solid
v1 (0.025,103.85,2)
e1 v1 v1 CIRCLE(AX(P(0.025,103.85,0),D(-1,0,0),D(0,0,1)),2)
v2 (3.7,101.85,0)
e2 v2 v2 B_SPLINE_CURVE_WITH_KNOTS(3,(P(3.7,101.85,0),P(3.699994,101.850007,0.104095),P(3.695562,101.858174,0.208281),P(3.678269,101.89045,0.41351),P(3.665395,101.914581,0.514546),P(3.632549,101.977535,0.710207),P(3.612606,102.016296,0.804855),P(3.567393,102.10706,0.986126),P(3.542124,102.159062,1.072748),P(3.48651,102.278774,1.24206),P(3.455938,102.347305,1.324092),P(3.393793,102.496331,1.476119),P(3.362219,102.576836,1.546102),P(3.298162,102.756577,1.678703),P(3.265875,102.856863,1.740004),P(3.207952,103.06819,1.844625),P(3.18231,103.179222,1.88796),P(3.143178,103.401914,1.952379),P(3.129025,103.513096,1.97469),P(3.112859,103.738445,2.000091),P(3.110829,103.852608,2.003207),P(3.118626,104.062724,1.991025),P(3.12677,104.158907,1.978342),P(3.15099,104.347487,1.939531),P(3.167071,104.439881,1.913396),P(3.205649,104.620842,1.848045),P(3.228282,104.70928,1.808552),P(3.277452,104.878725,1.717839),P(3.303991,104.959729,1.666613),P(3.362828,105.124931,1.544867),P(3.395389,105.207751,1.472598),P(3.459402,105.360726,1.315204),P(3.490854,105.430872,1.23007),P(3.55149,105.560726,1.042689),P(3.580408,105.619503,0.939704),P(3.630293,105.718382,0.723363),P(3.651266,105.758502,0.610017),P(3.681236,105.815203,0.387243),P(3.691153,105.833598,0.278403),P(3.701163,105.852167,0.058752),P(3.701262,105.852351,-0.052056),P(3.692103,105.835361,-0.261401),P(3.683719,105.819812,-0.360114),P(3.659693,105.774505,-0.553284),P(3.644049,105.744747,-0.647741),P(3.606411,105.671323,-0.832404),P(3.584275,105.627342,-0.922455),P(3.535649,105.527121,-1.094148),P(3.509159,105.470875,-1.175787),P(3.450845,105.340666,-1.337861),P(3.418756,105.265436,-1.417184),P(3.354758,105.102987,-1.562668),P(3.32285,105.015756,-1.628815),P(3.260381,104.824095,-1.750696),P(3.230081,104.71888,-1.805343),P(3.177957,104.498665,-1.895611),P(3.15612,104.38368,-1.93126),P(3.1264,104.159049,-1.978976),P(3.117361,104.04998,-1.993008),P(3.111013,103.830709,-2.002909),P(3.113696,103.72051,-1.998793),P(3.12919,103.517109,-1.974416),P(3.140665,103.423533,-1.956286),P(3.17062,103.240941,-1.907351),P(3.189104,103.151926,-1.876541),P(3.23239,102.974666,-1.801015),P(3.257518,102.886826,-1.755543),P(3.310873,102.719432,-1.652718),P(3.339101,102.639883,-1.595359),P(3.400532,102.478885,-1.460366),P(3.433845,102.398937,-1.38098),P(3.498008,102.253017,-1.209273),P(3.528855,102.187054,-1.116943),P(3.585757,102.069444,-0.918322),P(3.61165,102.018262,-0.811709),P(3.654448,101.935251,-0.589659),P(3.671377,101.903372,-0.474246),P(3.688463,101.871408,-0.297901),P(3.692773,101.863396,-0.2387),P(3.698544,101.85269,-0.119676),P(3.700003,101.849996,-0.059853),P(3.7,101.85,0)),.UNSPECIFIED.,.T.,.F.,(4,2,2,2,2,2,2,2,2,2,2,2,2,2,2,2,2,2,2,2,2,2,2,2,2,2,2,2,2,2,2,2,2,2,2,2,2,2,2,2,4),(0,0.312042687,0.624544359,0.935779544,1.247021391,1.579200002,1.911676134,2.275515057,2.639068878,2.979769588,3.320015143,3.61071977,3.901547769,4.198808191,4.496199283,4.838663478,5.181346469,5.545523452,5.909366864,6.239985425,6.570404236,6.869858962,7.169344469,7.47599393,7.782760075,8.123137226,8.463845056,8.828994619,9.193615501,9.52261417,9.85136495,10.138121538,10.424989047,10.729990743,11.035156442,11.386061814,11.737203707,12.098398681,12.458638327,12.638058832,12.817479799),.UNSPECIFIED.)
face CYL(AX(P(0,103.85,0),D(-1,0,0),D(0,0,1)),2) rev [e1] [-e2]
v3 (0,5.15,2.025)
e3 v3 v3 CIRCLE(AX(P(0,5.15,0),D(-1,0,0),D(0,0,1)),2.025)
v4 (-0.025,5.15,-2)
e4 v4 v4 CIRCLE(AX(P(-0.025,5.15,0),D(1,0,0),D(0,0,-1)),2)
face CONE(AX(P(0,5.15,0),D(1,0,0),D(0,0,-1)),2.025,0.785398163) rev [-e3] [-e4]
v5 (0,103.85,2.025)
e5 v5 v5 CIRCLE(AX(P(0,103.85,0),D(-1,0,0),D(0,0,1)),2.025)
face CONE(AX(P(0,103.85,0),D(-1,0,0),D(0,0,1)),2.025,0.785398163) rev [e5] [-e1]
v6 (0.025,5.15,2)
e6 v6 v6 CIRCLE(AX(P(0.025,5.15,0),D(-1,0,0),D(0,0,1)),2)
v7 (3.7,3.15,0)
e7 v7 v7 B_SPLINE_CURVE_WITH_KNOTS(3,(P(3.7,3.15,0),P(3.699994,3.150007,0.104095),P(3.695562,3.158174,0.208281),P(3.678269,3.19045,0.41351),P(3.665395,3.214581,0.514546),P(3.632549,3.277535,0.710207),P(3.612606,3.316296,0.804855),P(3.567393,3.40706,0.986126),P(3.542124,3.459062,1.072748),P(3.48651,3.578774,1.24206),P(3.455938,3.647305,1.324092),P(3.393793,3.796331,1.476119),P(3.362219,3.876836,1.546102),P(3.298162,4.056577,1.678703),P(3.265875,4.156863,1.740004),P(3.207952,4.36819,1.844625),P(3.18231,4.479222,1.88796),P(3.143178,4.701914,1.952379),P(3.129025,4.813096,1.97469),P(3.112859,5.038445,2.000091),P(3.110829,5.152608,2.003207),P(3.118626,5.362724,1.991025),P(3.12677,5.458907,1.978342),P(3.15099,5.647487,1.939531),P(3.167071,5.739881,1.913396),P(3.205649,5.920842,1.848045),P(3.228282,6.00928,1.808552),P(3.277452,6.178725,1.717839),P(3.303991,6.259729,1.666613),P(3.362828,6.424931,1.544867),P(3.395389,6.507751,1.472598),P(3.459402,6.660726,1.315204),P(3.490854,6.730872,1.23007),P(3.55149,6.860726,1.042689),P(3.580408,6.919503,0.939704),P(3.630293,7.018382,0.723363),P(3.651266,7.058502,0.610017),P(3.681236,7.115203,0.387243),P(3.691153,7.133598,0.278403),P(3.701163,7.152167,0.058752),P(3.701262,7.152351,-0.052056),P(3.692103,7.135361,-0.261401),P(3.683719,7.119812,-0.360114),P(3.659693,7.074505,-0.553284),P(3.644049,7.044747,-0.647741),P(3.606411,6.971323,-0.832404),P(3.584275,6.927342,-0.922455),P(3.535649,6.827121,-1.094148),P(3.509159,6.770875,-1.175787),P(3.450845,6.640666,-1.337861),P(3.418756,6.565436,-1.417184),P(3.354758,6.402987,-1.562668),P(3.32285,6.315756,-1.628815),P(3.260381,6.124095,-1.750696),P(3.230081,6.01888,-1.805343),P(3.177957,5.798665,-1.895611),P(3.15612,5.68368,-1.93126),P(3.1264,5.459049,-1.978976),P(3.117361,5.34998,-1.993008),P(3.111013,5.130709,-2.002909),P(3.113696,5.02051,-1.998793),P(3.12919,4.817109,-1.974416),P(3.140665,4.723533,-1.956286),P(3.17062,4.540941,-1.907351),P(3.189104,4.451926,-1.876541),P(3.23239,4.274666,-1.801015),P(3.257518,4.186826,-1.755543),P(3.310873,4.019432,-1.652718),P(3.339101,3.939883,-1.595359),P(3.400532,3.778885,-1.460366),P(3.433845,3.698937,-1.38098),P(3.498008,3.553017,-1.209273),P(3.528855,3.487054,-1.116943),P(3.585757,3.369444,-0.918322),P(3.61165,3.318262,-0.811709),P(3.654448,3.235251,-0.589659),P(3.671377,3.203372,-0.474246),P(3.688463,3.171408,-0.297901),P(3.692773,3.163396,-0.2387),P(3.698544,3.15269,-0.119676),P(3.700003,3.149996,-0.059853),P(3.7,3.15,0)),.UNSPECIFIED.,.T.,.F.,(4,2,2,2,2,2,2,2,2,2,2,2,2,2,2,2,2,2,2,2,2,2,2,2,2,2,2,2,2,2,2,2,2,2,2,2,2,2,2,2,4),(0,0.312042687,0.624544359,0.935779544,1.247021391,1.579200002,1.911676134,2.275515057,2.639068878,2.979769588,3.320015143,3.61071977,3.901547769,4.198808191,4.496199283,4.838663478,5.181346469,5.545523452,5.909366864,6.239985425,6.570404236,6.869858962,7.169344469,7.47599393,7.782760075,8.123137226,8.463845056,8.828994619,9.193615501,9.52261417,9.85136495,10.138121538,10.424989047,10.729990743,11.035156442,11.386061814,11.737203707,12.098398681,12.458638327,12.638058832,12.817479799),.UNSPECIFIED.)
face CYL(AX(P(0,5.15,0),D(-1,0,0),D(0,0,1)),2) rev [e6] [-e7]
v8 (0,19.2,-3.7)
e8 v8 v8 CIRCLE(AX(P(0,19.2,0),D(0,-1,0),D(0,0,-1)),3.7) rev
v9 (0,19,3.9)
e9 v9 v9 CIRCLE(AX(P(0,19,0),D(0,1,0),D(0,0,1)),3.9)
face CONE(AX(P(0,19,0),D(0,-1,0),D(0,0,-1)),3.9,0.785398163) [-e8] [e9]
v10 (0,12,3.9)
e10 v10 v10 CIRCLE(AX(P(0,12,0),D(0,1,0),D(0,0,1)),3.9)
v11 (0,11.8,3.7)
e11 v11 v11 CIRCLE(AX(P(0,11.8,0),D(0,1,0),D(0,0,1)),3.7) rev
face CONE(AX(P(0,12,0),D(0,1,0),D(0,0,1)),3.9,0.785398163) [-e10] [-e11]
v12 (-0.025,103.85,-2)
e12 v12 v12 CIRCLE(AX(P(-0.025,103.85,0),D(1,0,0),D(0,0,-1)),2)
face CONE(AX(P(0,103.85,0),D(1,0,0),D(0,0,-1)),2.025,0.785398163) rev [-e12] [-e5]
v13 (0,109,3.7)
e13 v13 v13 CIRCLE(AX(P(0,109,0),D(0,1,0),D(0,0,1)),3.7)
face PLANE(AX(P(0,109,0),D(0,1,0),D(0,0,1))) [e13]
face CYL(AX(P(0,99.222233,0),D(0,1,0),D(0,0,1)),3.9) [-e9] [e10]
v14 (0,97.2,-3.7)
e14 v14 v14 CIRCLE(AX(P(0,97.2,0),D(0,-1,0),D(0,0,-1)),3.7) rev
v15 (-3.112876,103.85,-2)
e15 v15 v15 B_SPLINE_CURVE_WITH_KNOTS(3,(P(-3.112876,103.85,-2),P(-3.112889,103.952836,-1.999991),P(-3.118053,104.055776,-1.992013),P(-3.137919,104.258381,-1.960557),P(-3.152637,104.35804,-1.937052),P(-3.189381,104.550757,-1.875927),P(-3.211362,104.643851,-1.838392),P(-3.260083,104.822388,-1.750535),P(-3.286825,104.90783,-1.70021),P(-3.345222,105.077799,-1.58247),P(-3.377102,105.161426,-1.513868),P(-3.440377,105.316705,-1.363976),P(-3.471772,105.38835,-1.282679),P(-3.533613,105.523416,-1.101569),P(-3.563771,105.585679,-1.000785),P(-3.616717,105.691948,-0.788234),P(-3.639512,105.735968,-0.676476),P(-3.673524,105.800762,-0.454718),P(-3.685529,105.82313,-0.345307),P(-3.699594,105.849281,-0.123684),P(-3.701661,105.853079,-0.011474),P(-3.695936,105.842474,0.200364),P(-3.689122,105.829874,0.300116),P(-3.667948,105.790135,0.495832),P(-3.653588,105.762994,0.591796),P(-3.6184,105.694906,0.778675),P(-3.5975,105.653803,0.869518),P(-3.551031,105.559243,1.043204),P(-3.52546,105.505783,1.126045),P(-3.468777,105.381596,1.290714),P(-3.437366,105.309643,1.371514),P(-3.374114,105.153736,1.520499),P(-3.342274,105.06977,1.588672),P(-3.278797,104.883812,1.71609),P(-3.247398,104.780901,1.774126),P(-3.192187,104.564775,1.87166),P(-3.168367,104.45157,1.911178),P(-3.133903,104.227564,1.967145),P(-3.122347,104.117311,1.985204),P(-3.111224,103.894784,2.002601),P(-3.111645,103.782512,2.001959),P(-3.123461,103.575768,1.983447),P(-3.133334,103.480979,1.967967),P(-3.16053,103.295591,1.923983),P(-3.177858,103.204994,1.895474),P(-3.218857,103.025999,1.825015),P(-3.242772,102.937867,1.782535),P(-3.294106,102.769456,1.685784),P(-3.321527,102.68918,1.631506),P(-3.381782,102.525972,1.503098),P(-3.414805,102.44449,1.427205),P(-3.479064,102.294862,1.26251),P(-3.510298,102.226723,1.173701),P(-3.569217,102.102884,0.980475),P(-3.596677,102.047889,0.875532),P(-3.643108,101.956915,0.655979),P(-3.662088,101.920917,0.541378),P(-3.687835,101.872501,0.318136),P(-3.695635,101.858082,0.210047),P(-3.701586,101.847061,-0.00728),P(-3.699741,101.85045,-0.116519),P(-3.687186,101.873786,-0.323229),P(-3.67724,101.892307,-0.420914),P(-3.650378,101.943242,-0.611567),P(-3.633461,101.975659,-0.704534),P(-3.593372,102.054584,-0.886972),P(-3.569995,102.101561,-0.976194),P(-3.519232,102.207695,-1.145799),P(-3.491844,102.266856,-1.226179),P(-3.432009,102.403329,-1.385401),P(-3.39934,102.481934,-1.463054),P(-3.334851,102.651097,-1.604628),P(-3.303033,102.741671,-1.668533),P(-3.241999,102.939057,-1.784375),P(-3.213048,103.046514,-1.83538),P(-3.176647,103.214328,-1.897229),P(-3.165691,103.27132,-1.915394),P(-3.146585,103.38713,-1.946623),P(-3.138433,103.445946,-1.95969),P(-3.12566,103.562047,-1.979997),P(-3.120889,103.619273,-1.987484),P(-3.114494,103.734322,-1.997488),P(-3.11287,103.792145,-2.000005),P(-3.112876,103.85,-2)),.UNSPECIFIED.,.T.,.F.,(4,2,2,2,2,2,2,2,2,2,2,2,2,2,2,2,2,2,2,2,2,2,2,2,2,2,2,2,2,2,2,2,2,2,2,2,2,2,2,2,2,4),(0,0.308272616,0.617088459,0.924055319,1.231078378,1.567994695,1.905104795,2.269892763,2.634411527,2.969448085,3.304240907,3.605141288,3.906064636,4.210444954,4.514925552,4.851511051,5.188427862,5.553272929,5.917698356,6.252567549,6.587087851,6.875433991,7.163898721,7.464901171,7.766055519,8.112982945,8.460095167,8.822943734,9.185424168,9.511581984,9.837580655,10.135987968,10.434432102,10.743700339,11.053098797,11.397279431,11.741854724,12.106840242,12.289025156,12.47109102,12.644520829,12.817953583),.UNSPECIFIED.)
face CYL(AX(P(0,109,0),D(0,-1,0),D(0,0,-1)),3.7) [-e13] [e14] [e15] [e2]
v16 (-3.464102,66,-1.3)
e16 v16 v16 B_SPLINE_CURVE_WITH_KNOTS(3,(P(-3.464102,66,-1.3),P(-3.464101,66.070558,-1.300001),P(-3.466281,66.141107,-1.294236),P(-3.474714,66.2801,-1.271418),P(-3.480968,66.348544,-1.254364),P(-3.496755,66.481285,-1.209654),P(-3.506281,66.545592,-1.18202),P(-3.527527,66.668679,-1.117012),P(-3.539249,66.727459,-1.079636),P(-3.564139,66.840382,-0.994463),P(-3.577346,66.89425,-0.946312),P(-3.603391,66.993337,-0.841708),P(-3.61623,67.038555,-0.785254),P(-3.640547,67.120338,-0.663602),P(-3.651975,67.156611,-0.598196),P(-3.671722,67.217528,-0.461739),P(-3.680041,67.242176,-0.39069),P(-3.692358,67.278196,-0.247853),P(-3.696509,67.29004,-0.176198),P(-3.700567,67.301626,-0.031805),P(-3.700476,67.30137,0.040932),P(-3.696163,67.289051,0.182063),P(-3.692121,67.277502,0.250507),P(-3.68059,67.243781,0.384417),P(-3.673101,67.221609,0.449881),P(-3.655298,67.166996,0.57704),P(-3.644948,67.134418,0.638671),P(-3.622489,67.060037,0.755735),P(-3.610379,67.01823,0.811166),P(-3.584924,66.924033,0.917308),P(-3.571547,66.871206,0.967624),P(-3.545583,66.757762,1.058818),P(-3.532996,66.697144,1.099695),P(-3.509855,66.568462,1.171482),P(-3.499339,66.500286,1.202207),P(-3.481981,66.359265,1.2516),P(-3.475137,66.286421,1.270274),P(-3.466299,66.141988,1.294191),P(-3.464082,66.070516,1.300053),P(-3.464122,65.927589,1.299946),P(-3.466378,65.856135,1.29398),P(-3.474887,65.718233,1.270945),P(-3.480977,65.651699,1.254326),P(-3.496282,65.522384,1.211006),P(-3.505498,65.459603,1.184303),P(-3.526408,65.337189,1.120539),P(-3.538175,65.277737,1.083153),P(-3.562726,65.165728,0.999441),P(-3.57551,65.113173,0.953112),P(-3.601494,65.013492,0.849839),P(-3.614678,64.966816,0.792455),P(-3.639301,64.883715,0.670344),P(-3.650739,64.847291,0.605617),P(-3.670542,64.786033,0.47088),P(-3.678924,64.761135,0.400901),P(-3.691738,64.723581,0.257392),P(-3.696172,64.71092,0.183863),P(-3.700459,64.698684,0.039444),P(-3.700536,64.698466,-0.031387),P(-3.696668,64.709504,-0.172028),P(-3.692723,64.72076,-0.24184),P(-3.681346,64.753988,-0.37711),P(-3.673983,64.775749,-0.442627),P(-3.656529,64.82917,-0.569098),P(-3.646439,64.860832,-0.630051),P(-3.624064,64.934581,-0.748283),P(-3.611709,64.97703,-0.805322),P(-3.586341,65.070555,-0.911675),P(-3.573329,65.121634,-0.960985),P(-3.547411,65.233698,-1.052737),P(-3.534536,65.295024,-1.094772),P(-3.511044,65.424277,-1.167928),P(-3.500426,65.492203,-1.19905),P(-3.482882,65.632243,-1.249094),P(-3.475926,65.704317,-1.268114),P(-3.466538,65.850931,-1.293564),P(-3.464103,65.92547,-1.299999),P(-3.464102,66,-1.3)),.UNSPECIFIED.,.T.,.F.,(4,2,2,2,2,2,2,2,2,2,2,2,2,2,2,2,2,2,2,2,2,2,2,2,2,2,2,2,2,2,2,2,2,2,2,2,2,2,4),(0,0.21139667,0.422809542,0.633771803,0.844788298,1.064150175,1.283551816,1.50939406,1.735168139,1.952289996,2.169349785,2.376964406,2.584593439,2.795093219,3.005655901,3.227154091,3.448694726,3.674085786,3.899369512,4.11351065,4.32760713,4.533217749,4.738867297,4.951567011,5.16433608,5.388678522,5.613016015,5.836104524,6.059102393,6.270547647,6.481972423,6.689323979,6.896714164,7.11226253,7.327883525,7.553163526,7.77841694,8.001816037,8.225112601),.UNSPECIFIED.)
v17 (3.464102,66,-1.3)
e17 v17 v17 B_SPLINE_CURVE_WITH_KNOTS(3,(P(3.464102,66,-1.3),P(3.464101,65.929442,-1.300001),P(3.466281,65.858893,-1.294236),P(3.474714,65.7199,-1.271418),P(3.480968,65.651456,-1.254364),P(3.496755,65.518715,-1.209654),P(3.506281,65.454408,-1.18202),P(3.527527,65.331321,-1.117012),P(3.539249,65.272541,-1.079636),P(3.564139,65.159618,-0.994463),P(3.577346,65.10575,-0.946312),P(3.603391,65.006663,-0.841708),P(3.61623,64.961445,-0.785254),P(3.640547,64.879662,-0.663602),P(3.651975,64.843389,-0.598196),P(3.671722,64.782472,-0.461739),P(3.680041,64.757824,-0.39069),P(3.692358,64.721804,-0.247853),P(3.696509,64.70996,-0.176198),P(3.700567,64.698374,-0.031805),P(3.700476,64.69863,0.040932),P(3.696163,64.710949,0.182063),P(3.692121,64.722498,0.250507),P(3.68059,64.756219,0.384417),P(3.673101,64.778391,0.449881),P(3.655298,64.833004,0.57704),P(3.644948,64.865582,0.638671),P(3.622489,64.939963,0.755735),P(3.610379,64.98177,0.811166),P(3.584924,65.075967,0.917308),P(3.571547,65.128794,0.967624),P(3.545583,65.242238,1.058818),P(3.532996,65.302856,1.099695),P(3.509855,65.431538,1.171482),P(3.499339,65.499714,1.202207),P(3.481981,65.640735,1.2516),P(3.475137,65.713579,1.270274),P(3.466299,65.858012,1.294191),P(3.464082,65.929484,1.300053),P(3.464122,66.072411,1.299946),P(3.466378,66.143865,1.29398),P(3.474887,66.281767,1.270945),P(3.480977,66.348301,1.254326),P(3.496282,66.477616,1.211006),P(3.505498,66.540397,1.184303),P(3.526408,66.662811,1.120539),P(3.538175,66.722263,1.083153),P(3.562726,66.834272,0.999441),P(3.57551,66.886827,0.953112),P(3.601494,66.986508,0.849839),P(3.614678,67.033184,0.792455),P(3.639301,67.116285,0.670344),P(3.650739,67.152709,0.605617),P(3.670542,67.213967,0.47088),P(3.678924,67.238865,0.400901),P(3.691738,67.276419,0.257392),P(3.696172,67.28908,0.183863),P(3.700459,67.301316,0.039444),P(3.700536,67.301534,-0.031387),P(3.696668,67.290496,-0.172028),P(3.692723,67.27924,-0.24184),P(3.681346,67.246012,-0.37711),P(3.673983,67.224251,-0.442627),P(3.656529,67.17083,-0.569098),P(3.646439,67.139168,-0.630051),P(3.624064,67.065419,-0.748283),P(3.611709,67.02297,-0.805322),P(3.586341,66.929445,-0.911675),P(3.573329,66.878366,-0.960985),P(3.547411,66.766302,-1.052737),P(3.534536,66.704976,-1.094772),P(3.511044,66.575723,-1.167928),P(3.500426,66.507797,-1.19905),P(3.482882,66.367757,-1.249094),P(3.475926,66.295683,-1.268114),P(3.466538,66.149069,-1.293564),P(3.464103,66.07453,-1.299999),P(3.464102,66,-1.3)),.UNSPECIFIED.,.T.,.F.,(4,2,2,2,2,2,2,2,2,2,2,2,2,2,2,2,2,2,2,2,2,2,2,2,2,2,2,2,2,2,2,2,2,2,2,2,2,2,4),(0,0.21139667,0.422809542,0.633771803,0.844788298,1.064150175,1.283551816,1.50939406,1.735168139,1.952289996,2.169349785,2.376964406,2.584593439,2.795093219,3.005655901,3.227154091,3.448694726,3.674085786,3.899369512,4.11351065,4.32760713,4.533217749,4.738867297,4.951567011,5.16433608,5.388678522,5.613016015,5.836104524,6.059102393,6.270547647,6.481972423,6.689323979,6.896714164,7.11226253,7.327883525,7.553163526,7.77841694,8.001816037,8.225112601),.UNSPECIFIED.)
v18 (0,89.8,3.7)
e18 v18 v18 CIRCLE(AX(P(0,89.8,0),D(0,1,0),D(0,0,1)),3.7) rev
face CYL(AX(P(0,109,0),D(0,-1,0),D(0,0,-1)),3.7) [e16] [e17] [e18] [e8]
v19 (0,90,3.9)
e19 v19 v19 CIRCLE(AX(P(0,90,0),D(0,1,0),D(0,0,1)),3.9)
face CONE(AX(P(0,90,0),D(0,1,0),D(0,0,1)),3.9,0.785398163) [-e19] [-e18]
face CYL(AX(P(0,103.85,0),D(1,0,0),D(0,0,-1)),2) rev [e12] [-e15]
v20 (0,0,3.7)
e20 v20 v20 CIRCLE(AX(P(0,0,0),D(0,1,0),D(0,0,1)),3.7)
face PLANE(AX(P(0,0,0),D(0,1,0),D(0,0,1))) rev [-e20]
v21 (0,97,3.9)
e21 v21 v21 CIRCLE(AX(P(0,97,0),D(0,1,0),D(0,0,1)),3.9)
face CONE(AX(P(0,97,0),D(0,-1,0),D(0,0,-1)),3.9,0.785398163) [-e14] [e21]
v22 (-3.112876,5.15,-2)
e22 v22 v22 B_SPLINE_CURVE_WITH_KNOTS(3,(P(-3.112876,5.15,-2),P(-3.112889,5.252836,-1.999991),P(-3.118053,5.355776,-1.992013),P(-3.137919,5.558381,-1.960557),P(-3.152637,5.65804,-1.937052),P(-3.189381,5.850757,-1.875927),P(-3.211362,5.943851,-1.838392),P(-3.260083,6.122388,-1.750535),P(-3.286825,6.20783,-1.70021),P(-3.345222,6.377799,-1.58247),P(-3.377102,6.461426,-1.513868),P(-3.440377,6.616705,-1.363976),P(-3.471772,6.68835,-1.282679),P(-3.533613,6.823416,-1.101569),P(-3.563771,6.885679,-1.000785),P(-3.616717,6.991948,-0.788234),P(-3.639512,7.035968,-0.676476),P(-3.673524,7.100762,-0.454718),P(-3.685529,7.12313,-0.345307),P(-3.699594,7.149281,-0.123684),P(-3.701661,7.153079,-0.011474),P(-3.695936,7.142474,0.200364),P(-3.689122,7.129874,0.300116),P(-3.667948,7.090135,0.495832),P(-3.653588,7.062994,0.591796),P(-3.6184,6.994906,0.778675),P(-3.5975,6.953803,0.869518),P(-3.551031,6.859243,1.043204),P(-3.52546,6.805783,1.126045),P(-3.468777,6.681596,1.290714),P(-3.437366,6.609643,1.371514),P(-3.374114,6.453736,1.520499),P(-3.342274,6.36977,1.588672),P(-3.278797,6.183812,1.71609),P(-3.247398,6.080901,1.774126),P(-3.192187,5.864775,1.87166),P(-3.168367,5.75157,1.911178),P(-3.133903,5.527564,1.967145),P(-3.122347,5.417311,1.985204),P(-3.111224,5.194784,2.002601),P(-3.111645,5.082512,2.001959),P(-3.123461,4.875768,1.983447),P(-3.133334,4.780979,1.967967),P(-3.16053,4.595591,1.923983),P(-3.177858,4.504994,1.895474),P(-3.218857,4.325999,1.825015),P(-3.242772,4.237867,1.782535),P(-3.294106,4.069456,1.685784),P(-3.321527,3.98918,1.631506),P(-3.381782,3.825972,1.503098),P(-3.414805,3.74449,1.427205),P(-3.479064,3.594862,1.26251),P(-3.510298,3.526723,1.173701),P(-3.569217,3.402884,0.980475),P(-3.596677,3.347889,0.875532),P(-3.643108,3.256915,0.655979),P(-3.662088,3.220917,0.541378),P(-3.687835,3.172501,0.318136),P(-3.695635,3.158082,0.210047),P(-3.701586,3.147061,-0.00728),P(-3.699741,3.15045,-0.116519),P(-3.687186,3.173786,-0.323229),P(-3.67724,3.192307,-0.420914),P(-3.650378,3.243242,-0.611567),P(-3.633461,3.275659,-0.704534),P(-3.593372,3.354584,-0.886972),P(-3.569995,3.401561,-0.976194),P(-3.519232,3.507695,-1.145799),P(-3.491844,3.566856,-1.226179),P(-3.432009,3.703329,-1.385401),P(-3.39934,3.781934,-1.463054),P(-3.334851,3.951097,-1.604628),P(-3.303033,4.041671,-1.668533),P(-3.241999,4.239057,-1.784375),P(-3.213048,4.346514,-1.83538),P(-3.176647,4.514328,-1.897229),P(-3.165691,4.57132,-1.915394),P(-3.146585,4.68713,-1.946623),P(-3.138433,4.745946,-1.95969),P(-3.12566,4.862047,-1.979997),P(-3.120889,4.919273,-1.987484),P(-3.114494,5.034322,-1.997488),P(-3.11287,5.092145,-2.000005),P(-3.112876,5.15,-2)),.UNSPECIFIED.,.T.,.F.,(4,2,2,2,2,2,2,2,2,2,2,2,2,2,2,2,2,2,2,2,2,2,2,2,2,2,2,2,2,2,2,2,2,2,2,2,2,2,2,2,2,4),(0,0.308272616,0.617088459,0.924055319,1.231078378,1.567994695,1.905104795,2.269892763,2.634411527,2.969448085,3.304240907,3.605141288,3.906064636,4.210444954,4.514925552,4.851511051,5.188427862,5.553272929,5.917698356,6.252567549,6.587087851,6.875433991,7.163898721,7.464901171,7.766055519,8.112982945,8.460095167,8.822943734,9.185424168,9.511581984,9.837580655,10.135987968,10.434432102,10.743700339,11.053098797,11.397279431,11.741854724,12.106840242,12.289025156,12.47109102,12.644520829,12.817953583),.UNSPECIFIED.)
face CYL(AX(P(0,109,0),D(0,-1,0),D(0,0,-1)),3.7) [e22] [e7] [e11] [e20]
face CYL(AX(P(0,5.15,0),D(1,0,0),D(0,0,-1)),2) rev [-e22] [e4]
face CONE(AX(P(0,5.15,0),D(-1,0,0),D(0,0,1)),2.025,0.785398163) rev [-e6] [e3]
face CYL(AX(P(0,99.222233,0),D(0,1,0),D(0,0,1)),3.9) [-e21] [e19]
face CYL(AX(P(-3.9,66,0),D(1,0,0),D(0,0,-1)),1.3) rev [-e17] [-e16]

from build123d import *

# Parameters (mm, degrees)
SKETCH1_R                      = 3.7
BOSS_EXTRUDE1_DEPTH            = 109
F_4_0MM_DOWEL_HOLE1_AT_2_COUNT = 2
F_4_0MM_DOWEL_HOLE1_AT_2_PITCH = 98.7
F_4_0MM_DOWEL_HOLE2_AT_2_COUNT = 2
F_4_0MM_DOWEL_HOLE2_AT_2_PITCH = 98.7
SKETCH7_W                      = 0.2
SKETCH7_H                      = 7
CHAMFER1_SIZE                  = 0.2
CUT_EXTRUDE2_DEPTH             = 110.139452178
CUT_EXTRUDE2_DEPTH_BACK        = 110.139452178
SKETCH8_R                      = 1.3


with BuildPart() as part:
    # Sketch1 → Boss-Extrude1 (new body)
    with BuildSketch(Plane(origin=(0, 0, 0), x_dir=(1, 0, 0), z_dir=(0, 1, 0))):
        with Locations(Location((0, 0, 0), (0, 0, 270))):
            Circle(SKETCH1_R)
    extrude(amount=BOSS_EXTRUDE1_DEPTH)

    # Sketch4 → Ø4.0mm Dowel Hole1 (revolve, cut)
    with BuildSketch(Plane(origin=(0, 5.15, 0), x_dir=(0, 0, -1), z_dir=(0, 1, 0))):
        Polygon((0, 0), (0, 3.7), (2, 3.7), (2, 0.025), (2.025, 0), align=None)
    f_4_0mm_dowel_hole1 = revolve(axis=Axis((6.35, 5.15, 0), (-1, 0, 0)), mode=Mode.SUBTRACT)

    # Ø4.0mm Dowel Hole1 at 2: Ø4.0mm Dowel Hole1 ×2
    with Locations(*[(0, i * F_4_0MM_DOWEL_HOLE1_AT_2_PITCH, 0) for i in range(1, F_4_0MM_DOWEL_HOLE1_AT_2_COUNT)]):
        add(f_4_0mm_dowel_hole1, mode=Mode.SUBTRACT)

    # Sketch6 → Ø4.0mm Dowel Hole2 (revolve, cut)
    with BuildSketch(Plane.ZX.offset(103.85)):
        Polygon((0, 0), (0, 3.7), (2, 3.7), (2, 0.025), (2.025, 0), align=None)
    f_4_0mm_dowel_hole2 = revolve(axis=Axis((-6.35, 103.85, 0), (1, 0, 0)), mode=Mode.SUBTRACT)

    # Ø4.0mm Dowel Hole2 at 2: Ø4.0mm Dowel Hole2 ×2
    with Locations(*[(0, -i * F_4_0MM_DOWEL_HOLE2_AT_2_PITCH, 0) for i in range(1, F_4_0MM_DOWEL_HOLE2_AT_2_COUNT)]):
        add(f_4_0mm_dowel_hole2, mode=Mode.SUBTRACT)

    # Sketch7 → Revolve1 (revolve)
    with BuildSketch(Plane(origin=(0, 0, 0), x_dir=(0, 0, -1), z_dir=(1, 0, 0)), mode=Mode.PRIVATE) as revolve1_sk:
        with Locations((3.8, 93.5)):
            Rectangle(SKETCH7_W, SKETCH7_H)
        with Locations((3.8, 15.5)):
            Rectangle(SKETCH7_W, SKETCH7_H)
    revolve(revolve1_sk.sketch.rotate(Axis((0, 99.222233113, 0), (0, -1, 0)), 180), axis=Axis((0, 99.222233113, 0), (0, -1, 0)))

    # Chamfer1
    chamfer1_edges = [part.edges().sort_by_distance(p)[0] for p in [
        (0, 97, -3.7),
        (0, 90, -3.7),
        (0, 19, -3.7),
        (0, 12, -3.7),
    ]]
    chamfer(chamfer1_edges, length=CHAMFER1_SIZE - 0.0001)  # a hair under: the kernel refuses the full size

    # Sketch8 → Cut-Extrude2 (cut, two sides: drawn at the far end of the back side and taken through both)
    with BuildSketch(Plane(origin=(0, 0, 0), x_dir=(0, 0, -1), z_dir=(1, 0, 0)).offset(-CUT_EXTRUDE2_DEPTH_BACK)):
        with Locations((0, 66)):
            Circle(SKETCH8_R)
    extrude(amount=CUT_EXTRUDE2_DEPTH + CUT_EXTRUDE2_DEPTH_BACK, mode=Mode.SUBTRACT)


solid = part.part
